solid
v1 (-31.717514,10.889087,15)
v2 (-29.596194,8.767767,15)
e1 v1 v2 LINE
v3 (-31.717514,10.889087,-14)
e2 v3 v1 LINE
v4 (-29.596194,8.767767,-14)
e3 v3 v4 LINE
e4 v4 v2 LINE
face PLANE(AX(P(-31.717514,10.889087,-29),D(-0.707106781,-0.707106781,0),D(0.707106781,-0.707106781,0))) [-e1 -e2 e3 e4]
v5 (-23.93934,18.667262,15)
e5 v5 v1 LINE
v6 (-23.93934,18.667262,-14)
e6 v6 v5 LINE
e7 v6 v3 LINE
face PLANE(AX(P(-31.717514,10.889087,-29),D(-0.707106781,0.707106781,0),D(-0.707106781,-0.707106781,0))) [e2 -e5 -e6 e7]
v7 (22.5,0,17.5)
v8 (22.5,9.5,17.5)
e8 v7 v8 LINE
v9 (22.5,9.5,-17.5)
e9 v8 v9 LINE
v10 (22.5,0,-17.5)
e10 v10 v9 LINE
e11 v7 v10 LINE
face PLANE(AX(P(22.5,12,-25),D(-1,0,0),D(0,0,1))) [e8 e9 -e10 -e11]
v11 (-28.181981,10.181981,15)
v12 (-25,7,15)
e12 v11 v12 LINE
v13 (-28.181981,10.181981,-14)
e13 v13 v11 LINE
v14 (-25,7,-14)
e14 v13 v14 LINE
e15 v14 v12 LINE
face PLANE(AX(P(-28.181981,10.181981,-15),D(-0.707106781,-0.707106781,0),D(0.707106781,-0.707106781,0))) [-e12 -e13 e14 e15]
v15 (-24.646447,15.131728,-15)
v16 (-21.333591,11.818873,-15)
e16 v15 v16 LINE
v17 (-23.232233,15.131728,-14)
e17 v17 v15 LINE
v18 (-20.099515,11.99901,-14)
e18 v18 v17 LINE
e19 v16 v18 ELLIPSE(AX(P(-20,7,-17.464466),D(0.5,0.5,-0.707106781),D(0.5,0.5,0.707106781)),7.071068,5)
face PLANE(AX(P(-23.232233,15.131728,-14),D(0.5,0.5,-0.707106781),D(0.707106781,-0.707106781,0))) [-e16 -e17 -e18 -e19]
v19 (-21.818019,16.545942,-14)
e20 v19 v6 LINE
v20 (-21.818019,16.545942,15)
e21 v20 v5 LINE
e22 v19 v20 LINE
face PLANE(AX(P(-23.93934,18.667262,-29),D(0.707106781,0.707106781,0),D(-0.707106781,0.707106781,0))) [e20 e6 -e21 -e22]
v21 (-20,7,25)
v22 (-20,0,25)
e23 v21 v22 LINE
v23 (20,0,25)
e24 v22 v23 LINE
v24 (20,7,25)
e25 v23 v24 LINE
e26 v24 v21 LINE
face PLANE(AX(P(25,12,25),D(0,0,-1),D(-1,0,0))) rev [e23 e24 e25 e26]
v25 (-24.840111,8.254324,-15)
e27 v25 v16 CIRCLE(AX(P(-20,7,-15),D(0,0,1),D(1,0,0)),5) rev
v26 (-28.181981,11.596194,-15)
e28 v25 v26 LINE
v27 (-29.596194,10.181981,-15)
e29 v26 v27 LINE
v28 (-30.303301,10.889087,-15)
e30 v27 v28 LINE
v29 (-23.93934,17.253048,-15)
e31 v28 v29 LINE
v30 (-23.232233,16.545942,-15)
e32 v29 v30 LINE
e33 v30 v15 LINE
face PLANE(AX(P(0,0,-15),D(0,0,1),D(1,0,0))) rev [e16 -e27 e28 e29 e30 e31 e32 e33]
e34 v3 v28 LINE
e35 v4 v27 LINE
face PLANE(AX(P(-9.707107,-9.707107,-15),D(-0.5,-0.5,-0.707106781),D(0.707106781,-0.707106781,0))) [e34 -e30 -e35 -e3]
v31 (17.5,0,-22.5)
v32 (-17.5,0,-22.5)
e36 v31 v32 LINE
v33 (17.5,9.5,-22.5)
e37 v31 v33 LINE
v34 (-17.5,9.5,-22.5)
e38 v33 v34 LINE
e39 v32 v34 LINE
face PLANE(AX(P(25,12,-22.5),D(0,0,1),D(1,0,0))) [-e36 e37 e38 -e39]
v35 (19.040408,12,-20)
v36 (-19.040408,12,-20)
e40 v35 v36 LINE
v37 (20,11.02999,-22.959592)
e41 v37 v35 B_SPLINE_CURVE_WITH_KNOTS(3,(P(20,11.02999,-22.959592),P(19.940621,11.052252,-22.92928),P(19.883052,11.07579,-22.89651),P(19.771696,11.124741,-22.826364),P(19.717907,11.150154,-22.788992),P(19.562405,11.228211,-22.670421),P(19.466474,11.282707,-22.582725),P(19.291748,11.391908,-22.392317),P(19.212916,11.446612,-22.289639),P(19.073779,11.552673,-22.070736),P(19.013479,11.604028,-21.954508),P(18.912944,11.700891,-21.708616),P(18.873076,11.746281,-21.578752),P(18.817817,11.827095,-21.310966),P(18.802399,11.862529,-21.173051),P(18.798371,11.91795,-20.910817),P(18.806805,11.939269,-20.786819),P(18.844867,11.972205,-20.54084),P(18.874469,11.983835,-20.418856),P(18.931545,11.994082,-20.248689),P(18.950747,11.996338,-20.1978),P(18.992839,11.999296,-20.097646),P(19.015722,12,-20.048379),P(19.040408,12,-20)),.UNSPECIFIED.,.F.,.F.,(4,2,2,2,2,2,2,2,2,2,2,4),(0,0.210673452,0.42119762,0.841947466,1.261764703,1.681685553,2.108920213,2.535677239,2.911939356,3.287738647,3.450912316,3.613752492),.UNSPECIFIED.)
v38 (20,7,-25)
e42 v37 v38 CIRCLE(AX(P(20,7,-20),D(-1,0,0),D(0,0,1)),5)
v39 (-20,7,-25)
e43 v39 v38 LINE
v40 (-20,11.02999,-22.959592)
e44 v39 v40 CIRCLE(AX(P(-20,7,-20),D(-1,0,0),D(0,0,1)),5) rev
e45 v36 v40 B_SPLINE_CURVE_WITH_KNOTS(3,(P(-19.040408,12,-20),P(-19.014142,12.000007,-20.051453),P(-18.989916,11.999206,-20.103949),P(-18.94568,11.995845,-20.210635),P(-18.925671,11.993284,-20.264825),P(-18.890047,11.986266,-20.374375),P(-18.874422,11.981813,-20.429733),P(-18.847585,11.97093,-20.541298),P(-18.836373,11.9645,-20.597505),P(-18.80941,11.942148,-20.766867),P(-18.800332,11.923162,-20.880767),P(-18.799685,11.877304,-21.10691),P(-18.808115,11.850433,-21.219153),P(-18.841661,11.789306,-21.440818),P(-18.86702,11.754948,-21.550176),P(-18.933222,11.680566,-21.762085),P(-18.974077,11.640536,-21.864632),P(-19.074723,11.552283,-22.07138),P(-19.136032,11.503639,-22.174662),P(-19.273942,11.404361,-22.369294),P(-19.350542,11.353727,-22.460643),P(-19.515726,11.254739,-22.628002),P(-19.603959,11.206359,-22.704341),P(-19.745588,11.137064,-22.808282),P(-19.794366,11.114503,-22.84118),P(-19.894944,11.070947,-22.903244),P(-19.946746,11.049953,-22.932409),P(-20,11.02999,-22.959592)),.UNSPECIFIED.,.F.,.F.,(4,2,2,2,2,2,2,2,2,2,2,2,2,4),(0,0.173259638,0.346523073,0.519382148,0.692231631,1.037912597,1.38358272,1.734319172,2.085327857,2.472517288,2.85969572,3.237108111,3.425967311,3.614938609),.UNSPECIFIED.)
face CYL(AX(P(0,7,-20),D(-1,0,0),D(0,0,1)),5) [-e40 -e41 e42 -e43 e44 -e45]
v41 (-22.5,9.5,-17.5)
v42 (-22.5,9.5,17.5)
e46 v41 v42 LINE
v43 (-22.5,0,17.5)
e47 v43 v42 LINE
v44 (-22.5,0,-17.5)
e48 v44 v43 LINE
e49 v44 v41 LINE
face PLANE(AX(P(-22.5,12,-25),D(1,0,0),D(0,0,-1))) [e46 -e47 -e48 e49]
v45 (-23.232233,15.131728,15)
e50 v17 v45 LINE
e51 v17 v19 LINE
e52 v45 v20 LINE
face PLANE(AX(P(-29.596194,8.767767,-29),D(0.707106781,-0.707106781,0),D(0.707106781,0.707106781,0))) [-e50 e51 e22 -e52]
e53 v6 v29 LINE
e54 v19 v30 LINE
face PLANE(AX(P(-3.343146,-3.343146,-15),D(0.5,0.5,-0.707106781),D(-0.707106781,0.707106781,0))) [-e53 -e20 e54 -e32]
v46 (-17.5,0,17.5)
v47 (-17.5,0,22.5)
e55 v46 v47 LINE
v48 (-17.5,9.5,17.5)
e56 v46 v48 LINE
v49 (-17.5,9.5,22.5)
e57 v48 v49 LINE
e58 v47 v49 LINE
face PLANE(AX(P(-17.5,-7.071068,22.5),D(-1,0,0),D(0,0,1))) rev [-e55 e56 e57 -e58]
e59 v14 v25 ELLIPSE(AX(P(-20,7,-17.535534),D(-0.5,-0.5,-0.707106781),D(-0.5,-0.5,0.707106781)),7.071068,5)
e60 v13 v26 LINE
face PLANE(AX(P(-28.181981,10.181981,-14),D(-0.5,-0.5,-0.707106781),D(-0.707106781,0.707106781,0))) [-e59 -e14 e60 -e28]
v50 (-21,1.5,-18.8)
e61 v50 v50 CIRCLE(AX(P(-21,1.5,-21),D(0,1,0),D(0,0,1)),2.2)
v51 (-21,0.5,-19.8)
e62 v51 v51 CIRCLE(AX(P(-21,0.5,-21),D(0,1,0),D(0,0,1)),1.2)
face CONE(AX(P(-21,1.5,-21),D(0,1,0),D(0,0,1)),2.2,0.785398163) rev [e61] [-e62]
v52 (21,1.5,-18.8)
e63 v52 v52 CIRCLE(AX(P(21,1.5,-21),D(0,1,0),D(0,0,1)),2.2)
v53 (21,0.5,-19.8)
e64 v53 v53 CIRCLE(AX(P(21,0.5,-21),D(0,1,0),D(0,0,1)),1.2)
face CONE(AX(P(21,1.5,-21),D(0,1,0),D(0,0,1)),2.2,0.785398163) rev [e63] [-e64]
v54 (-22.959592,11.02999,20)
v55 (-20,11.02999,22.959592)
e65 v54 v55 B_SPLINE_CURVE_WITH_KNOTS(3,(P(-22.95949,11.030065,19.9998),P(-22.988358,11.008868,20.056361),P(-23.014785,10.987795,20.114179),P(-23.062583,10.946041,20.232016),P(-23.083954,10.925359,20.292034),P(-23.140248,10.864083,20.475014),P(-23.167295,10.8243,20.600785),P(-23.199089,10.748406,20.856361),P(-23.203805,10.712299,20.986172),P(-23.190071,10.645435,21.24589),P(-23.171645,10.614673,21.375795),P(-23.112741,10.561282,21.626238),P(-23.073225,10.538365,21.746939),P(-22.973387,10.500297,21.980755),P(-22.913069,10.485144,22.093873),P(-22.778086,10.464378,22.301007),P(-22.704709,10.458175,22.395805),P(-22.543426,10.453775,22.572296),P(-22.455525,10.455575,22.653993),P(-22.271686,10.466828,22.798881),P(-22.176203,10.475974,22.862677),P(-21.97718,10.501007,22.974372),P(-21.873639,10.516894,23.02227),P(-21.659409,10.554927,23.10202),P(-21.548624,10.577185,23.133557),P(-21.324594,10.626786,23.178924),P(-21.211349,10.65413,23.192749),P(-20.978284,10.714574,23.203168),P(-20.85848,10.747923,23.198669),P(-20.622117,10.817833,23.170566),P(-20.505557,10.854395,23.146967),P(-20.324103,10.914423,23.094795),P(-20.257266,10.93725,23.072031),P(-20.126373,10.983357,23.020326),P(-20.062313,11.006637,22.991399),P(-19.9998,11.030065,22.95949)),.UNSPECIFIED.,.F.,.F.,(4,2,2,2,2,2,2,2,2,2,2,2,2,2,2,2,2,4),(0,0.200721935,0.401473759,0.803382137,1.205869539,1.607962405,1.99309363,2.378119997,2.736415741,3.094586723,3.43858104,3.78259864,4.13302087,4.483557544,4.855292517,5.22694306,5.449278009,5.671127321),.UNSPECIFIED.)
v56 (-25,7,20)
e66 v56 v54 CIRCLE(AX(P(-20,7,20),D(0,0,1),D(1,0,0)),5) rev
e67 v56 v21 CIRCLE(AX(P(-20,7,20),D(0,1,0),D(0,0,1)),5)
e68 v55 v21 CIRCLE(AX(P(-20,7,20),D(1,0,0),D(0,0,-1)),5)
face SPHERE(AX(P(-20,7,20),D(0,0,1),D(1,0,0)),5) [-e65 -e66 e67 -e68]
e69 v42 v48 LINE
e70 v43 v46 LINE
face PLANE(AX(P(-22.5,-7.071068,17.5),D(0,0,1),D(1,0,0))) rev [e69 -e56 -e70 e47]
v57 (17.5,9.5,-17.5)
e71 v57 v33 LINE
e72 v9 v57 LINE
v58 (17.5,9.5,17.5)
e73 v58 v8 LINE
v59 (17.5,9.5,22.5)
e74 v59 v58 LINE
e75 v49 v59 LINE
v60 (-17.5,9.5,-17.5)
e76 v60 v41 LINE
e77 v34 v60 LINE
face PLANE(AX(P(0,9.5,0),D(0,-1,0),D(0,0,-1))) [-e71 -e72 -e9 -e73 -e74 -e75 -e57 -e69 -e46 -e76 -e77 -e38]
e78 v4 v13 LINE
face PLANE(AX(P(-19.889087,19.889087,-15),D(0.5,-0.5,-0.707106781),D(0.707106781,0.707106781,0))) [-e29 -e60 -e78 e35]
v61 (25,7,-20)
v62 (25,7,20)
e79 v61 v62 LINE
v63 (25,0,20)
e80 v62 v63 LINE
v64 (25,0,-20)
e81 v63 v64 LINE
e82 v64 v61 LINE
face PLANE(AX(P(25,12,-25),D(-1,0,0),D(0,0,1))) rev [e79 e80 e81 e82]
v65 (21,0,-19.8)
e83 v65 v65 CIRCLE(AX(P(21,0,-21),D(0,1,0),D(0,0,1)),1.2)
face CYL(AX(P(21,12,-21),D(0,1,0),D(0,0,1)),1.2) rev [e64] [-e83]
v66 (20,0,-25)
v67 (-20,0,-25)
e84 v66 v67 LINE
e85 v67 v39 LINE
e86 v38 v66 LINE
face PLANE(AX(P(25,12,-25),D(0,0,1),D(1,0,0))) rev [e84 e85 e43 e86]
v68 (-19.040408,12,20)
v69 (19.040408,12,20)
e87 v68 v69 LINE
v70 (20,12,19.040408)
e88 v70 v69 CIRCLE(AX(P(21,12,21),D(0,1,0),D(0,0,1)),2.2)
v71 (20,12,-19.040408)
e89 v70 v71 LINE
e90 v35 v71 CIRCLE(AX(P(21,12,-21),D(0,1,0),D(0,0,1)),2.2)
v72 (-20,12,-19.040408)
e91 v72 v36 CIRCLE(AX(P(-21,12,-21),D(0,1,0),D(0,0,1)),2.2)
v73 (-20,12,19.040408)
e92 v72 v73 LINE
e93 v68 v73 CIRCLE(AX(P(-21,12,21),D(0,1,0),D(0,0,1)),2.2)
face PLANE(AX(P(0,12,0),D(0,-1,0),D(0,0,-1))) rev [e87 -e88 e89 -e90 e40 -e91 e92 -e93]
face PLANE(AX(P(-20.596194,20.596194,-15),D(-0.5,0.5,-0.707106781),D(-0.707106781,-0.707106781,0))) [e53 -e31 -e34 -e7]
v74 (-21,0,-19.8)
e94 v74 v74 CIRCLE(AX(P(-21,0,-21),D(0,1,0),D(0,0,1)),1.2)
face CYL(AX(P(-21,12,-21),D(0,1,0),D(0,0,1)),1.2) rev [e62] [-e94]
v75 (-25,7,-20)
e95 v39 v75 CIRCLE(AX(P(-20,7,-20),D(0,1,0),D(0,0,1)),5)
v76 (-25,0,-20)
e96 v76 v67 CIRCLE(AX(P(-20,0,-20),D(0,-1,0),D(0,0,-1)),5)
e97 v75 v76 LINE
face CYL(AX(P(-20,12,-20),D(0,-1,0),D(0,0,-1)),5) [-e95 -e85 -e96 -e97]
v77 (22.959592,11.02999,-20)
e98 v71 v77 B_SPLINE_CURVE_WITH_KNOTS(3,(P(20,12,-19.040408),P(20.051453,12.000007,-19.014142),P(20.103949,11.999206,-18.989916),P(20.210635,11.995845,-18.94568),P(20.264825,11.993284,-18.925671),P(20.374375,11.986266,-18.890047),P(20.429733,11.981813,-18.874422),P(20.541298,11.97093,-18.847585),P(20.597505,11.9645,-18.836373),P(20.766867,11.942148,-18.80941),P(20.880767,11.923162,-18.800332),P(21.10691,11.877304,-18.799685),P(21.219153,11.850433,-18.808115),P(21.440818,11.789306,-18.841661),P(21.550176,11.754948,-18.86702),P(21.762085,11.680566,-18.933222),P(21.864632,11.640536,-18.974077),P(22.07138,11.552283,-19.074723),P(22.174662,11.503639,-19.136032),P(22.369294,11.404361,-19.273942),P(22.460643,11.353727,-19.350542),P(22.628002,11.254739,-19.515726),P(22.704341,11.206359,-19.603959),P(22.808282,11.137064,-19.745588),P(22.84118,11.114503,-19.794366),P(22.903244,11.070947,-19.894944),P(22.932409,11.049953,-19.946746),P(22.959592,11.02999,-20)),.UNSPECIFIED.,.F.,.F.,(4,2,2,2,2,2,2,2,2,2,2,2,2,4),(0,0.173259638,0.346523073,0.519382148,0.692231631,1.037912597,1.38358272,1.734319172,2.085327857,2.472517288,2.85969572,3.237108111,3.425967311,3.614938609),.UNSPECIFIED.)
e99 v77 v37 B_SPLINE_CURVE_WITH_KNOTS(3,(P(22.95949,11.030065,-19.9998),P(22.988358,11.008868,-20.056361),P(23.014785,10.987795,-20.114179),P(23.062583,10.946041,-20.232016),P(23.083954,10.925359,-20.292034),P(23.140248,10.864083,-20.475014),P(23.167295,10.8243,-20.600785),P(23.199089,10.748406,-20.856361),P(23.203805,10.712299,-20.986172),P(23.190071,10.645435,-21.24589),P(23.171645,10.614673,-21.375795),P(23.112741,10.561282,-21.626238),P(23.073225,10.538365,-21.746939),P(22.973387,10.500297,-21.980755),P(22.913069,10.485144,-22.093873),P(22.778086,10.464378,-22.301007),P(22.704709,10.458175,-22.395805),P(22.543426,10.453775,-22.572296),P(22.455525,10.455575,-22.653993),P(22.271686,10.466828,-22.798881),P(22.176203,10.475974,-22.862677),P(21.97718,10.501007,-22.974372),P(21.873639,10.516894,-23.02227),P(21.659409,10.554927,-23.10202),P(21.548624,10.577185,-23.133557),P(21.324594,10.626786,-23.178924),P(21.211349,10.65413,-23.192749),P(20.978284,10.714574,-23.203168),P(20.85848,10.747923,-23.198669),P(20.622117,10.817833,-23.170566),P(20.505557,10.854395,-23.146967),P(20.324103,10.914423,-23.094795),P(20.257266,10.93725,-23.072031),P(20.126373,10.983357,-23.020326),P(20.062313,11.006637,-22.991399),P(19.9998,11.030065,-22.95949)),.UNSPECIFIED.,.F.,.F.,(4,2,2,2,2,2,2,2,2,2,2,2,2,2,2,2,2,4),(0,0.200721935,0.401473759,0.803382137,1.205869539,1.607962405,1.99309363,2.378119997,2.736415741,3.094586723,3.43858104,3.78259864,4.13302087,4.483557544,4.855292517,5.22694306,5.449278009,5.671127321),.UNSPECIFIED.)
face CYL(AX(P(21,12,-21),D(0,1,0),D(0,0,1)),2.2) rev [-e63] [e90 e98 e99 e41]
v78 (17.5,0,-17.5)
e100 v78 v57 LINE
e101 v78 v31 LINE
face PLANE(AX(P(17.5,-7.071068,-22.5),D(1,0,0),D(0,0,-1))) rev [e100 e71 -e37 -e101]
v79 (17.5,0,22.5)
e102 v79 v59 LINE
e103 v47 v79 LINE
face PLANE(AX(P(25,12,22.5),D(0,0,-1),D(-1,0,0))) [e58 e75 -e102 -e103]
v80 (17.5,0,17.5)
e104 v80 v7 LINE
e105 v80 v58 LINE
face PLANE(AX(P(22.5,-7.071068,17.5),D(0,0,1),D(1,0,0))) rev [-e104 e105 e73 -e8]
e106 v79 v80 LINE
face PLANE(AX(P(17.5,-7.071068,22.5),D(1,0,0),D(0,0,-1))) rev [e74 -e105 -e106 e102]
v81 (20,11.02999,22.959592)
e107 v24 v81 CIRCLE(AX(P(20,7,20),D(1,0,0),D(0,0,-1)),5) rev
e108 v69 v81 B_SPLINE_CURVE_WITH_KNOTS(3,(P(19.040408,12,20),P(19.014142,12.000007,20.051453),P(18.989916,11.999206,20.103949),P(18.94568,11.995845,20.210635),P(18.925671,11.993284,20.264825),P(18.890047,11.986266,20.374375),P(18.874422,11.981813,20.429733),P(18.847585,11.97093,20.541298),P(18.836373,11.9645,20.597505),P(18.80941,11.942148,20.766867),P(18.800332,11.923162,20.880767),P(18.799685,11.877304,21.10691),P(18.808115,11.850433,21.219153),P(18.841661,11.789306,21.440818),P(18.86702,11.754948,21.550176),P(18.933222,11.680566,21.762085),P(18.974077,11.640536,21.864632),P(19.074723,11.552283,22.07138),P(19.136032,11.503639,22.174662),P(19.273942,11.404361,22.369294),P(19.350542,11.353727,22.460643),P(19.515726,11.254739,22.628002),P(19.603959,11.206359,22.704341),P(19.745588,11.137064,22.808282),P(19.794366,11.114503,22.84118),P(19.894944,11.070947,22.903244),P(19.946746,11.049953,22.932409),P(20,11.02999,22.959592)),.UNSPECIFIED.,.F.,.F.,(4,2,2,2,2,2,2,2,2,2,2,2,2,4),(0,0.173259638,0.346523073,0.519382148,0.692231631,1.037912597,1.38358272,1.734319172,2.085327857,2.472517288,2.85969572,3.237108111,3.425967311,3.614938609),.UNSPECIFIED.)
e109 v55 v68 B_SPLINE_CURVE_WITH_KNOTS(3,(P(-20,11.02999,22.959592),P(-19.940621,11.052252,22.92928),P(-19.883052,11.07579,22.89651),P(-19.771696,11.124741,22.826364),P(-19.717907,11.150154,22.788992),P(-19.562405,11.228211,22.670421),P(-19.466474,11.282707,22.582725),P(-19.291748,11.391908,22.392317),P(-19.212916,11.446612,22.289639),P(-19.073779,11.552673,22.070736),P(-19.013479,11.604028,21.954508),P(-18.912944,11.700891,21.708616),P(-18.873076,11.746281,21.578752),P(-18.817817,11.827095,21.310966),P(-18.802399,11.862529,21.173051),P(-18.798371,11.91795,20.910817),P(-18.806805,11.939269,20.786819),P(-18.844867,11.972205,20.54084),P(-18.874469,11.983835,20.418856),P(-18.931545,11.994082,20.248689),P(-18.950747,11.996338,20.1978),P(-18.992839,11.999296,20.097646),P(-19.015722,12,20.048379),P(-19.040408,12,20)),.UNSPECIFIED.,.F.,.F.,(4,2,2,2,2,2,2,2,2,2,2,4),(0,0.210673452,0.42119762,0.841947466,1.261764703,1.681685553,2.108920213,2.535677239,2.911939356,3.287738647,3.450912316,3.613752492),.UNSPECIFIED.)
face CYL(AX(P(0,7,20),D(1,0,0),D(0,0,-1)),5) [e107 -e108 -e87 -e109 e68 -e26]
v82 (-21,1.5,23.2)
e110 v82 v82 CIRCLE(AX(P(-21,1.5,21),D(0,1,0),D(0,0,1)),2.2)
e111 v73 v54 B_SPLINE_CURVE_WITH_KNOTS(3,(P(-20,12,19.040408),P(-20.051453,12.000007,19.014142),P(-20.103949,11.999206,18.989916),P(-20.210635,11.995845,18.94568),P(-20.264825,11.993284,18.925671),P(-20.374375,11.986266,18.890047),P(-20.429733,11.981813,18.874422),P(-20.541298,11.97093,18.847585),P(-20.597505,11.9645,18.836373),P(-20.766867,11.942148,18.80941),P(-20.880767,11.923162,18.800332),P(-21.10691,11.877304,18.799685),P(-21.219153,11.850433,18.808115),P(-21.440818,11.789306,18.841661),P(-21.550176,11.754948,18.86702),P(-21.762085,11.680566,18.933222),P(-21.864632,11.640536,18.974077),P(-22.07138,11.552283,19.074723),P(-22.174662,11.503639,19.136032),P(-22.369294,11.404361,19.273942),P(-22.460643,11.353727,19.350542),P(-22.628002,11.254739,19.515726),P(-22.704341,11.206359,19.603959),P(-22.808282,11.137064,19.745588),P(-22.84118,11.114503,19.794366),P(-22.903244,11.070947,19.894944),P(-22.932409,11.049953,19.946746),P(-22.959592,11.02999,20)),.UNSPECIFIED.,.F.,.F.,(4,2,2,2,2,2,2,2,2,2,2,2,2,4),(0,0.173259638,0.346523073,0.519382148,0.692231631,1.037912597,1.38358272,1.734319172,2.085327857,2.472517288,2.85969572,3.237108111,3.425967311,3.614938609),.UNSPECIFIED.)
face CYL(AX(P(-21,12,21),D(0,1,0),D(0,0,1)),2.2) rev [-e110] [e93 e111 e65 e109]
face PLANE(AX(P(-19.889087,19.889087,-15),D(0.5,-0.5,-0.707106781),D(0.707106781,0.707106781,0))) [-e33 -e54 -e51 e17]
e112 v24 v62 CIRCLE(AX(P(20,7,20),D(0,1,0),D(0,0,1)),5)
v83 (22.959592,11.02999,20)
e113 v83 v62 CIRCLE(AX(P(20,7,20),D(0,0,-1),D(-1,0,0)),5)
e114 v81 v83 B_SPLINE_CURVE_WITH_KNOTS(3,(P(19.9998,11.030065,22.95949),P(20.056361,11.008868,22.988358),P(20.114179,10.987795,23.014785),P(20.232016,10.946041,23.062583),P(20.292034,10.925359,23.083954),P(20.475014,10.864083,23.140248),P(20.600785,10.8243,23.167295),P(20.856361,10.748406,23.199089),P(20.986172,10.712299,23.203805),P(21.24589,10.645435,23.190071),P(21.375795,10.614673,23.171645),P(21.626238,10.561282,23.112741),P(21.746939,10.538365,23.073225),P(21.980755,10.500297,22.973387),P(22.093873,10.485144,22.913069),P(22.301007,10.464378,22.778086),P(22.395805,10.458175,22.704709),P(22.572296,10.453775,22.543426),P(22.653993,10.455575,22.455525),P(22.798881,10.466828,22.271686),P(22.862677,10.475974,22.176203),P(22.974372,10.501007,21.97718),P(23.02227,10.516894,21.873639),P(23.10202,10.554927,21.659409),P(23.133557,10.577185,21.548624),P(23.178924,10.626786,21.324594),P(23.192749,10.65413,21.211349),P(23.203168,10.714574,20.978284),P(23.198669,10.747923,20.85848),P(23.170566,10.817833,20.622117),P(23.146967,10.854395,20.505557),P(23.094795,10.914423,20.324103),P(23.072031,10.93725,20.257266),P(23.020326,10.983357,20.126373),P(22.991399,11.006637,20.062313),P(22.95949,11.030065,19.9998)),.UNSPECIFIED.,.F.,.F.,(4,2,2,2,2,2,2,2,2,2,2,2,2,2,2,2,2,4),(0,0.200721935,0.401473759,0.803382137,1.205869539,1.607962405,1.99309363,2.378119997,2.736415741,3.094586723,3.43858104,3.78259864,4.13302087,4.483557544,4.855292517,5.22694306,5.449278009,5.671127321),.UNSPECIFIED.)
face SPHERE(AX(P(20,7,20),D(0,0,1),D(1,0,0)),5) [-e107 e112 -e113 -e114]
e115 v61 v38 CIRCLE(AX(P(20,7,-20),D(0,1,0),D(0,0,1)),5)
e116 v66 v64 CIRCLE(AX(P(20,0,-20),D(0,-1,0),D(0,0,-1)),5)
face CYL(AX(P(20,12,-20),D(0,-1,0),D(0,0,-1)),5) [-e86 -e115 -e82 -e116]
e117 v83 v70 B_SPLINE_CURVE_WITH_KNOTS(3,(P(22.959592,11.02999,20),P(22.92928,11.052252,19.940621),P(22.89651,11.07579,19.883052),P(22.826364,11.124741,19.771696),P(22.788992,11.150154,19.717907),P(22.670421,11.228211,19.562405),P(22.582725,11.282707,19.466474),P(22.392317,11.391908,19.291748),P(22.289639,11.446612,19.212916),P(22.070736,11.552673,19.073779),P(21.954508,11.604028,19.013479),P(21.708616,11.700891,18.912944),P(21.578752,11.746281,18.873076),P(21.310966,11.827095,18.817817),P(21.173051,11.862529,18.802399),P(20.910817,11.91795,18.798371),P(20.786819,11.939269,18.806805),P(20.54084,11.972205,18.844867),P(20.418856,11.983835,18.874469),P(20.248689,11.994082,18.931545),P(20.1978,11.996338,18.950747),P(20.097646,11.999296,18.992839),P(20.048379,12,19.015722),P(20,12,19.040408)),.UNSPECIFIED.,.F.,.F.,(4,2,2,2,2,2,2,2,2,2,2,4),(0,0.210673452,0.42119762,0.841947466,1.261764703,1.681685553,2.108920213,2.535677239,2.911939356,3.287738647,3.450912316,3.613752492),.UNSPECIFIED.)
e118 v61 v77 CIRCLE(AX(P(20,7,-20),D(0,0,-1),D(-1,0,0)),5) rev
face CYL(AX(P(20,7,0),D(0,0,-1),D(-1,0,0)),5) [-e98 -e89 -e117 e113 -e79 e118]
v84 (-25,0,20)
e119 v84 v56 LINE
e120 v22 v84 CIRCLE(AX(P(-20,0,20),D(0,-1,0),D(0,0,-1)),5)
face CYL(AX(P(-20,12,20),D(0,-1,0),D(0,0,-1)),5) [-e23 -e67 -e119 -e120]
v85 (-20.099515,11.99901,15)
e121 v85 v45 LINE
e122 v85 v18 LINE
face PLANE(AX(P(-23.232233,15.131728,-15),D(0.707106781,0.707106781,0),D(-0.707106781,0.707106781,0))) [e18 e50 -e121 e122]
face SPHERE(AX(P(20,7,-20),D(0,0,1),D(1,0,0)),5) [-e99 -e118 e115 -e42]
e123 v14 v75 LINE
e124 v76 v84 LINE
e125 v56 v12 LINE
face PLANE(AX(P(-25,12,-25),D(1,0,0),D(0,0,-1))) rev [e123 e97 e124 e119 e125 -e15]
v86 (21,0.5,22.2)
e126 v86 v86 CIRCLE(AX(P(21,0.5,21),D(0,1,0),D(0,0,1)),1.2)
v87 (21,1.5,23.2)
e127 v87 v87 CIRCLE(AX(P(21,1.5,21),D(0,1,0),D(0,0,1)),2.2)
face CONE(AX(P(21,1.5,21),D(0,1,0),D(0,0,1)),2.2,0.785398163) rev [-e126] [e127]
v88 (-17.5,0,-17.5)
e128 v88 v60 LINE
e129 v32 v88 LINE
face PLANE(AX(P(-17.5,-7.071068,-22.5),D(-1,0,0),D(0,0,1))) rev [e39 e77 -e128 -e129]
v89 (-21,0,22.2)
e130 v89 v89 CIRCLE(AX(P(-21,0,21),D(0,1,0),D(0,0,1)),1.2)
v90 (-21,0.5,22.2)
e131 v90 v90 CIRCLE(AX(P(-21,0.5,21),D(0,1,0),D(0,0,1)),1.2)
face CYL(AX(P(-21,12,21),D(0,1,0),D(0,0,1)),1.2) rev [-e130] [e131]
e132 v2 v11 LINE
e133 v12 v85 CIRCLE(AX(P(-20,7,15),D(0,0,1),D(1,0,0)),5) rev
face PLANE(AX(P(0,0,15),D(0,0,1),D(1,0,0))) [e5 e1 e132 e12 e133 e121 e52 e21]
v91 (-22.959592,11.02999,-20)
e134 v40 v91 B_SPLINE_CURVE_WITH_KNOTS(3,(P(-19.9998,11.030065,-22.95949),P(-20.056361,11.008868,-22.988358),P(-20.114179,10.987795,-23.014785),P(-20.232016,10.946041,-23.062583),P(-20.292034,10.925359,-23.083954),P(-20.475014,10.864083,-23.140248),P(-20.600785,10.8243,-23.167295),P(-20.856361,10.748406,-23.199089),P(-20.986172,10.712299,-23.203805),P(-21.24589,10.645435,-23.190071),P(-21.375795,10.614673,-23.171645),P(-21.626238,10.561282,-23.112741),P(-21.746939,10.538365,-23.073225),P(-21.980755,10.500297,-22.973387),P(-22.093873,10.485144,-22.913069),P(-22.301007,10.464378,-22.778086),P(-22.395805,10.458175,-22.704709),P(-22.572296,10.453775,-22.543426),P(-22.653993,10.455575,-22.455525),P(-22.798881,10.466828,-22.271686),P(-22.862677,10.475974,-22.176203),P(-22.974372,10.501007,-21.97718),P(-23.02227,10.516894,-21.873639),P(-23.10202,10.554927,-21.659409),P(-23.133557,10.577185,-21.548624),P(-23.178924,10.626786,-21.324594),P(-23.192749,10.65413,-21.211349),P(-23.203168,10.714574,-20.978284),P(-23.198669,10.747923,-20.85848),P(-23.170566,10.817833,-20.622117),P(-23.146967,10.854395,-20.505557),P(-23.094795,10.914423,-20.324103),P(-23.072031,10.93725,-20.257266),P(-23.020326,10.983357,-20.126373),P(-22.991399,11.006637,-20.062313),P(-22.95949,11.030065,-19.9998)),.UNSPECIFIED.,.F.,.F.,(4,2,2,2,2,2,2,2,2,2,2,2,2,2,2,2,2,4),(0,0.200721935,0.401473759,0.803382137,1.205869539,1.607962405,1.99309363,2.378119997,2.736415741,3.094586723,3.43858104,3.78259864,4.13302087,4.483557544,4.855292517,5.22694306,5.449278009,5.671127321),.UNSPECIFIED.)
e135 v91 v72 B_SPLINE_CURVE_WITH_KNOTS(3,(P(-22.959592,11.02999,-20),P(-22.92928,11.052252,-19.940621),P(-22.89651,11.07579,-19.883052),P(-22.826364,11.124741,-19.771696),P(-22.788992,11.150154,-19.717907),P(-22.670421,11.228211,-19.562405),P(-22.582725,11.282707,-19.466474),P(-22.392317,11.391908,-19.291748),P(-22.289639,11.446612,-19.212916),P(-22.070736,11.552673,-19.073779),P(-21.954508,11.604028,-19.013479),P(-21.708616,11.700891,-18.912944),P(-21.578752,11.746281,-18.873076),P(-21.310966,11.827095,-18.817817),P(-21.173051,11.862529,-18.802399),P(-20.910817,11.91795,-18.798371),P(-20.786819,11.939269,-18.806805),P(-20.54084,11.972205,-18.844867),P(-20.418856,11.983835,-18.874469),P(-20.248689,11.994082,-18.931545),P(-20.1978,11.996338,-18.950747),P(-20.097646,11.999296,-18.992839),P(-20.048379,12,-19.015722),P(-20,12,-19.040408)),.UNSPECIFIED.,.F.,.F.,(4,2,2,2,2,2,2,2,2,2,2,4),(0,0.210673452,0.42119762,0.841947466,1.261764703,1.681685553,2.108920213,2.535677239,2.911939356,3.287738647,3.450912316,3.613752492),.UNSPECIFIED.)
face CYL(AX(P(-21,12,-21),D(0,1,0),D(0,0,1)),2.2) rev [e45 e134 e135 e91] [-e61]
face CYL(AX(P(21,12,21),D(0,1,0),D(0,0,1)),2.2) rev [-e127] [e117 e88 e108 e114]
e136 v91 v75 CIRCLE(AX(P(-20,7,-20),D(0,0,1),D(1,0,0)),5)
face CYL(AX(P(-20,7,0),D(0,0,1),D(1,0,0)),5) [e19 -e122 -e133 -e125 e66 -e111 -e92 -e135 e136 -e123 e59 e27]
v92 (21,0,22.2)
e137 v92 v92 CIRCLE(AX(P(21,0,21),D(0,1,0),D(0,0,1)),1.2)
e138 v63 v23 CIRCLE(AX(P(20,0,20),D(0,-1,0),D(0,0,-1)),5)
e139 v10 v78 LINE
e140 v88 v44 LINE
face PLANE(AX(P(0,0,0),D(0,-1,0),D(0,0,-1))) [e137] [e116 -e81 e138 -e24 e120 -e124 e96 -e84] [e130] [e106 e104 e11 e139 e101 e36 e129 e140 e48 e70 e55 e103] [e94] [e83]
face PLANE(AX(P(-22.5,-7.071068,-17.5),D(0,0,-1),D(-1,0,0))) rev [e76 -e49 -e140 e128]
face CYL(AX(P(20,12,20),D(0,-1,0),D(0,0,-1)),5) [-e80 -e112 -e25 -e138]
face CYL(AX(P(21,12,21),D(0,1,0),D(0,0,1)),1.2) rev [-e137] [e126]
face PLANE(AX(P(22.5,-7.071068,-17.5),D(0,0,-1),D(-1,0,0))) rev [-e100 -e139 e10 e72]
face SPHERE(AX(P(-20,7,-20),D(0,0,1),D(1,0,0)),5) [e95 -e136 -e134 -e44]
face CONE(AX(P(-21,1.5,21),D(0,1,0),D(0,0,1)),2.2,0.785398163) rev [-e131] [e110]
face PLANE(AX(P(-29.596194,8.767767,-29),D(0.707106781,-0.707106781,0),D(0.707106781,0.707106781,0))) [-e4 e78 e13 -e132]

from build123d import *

# Parameters (mm, degrees)
SKETCH1_W                                    = 50
SKETCH1_H                                    = 50
MAIN_BODY_DEPTH                              = 12
SHELL1_T                                     = -2.5
FILLET1_R                                    = 5
SKETCH6_W                                    = 5
SKETCH6_H                                    = 5
SCREW_SUPPORTS_DEPTH                         = 9.5
FILLET2_R                                    = 5
CSK_SLOT_FOR_M2_COUNTERSUNK_FLAT_HEA_2_COUNT = 2
CSK_SLOT_FOR_M2_COUNTERSUNK_FLAT_HEA_2_PITCH = 42
CSK_SLOT_FOR_M2_COUNTERSUNK_FLAT_HEA_3_COUNT = 2
CSK_SLOT_FOR_M2_COUNTERSUNK_FLAT_HEA_3_PITCH = 42
CSK_SLOT_FOR_M2_COUNTERSUNK_FLAT_HEA_4_COUNT = 2
CSK_SLOT_FOR_M2_COUNTERSUNK_FLAT_HEA_4_PITCH = 59.39696962
SKETCH13_W                                   = 13
SKETCH13_H                                   = 26
TOP_CONNECTOR_EXTRUDE_DEPTH                  = 6
SKETCH14_W                                   = 2
SKETCH14_H                                   = 3
DOVETAIL_CUT_DEPTH                           = 51.884673656
FILLET3_R                                    = 2
SKETCH16_W                                   = 8
SKETCH16_H                                   = 3.3
POGO_BODY_CUT_DEPTH                          = 8
SKETCH19_W                                   = 8
SKETCH19_H                                   = 0.6
POGO_BACK_SUPPORT_DEPTH                      = 3.2
SKETCH20_W                                   = 8
SKETCH20_H                                   = 2
POGO_STOPPER_DEPTH                           = 0.6
SKETCH23_W                                   = 15
SKETCH23_H                                   = 40
CUT_EXTRUDE1_DEPTH                           = 38.336309539
BOSS_EXTRUDE1_START                          = -10
BOSS_EXTRUDE1_DEPTH                          = 30
BOSS_EXTRUDE2_DEPTH                          = 30
CHAMFER2_SIZE                                = 1


with BuildPart() as part:
    # Sketch1 → main body (new body)
    with BuildSketch(Plane(origin=(0, 0, 0), x_dir=(1, 0, 0), z_dir=(0, 1, 0))):
        Rectangle(SKETCH1_W, SKETCH1_H)
    extrude(amount=MAIN_BODY_DEPTH)

    # Shell1
    shell1_openings = [part.faces().sort_by_distance(p)[0] for p in [
        (0, 0, 0),
    ]]
    offset(amount=SHELL1_T, openings=shell1_openings, kind=Kind.INTERSECTION)

    # Fillet1
    fillet1_edges = [part.edges().sort_by_distance(p)[0] for p in [
        (25, 12, 0),
        (0, 12, -25),
        (-25, 12, 0),
        (0, 12, 25),
    ]]
    fillet(fillet1_edges, radius=FILLET1_R)

    # Sketch6 → screw supports (add)
    with BuildSketch(Plane.XZ.offset(-9.5)):
        with Locations((20, 20)):
            Rectangle(SKETCH6_W, SKETCH6_H)
        with Locations((-20, 20)):
            Rectangle(SKETCH6_W, SKETCH6_H)
        with Locations((20, -20)):
            Rectangle(SKETCH6_W, SKETCH6_H)
        with Locations((-20, -20)):
            Rectangle(SKETCH6_W, SKETCH6_H)
    extrude(amount=SCREW_SUPPORTS_DEPTH)

    # Fillet2
    # the kernel refuses this fillet: 5 mm, written as the material it takes off along each edge
    with BuildSketch(Plane(origin=(-20, 7, 20), x_dir=(0, 0, 1), z_dir=(-1, 0, 0))) as fillet2_piece_1_section:
        Polygon((0, 0), (FILLET2_R, 0), (FILLET2_R, FILLET2_R), (0, FILLET2_R), align=None)
    fillet2_piece_1 = extrude(amount=FILLET2_R, mode=Mode.PRIVATE)
    fillet2_piece_1 = fillet2_piece_1 - Plane(origin=(-20, 7, 20), x_dir=(0, -0.7071067811865475, -0.7071067811865475), z_dir=(-1, 0, 0)) * Sphere(FILLET2_R, mode=Mode.PRIVATE)
    add(fillet2_piece_1, mode=Mode.SUBTRACT)
    with BuildSketch(Plane(origin=(-20, 7, -20), x_dir=(-1, 0, 0), z_dir=(0, 0, -1))) as fillet2_piece_2_section:
        Polygon((0, 0), (FILLET2_R, 0), (FILLET2_R, FILLET2_R), (0, FILLET2_R), align=None)
    fillet2_piece_2 = extrude(amount=FILLET2_R, mode=Mode.PRIVATE)
    fillet2_piece_2 = fillet2_piece_2 - Plane(origin=(-20, 7, -20), x_dir=(0.7071067811865475, -0.7071067811865475, 0), z_dir=(0, 0, -1)) * Sphere(FILLET2_R, mode=Mode.PRIVATE)
    add(fillet2_piece_2, mode=Mode.SUBTRACT)
    with BuildSketch(Plane(origin=(20, 7, 20), x_dir=(0, 0, 1), z_dir=(1, 0, 0))) as fillet2_piece_3_section:
        Polygon((0, 0), (FILLET2_R, 0), (FILLET2_R, -FILLET2_R), (0, -FILLET2_R), align=None)
    fillet2_piece_3 = extrude(amount=FILLET2_R, mode=Mode.PRIVATE)
    fillet2_piece_3 = fillet2_piece_3 - Plane(origin=(20, 7, 20), x_dir=(0, -0.7071067811865475, -0.7071067811865475), z_dir=(1, 0, 0)) * Sphere(FILLET2_R, mode=Mode.PRIVATE)
    add(fillet2_piece_3, mode=Mode.SUBTRACT)
    with BuildSketch(Plane(origin=(20, 7, -20), x_dir=(1, 0, 0), z_dir=(0, 0, -1))) as fillet2_piece_4_section:
        Polygon((0, 0), (FILLET2_R, 0), (FILLET2_R, -FILLET2_R), (0, -FILLET2_R), align=None)
    fillet2_piece_4 = extrude(amount=FILLET2_R, mode=Mode.PRIVATE)
    fillet2_piece_4 = fillet2_piece_4 - Plane(origin=(20, 7, -20), x_dir=(-0.7071067811865475, -0.7071067811865475, 0), z_dir=(0, 0, -1)) * Sphere(FILLET2_R, mode=Mode.PRIVATE)
    add(fillet2_piece_4, mode=Mode.SUBTRACT)
    with BuildSketch(Plane(origin=(25, -12.5, -25), x_dir=(-1, 0, 0), z_dir=(0, 1, 0)), Plane(origin=(25, -12.5, 25), x_dir=(0, 0, -1), z_dir=(0, 1, 0))) as fillet2_piece_5:
        with BuildLine():
            CenterArc((FILLET2_R, FILLET2_R), FILLET2_R, 180, 90)
            Line((0, FILLET2_R), (0, 0))
            Line((0, 0), (FILLET2_R, 0))
        make_face()
    extrude(amount=19.5, mode=Mode.SUBTRACT)
    with BuildSketch(Plane(origin=(-25, -12.5, -25), x_dir=(1, 0, 0), z_dir=(0, 1, 0)), Plane(origin=(-25, -12.5, 25), x_dir=(0, 0, -1), z_dir=(0, 1, 0))) as fillet2_piece_6:
        with BuildLine():
            CenterArc((FILLET2_R, -FILLET2_R), FILLET2_R, 90, 90)
            Line((0, -FILLET2_R), (0, 0))
            Line((0, 0), (FILLET2_R, 0))
        make_face()
    extrude(amount=19.5, mode=Mode.SUBTRACT)

    # Sketch12 → CSK SLOT for M2 Countersunk Flat Head Screw1 (revolve, cut)
    with BuildSketch(Plane(origin=(-21, 12, -21), x_dir=(0, 0, 1), z_dir=(1, 0, 0))):
        Polygon((0, 0), (0, 12), (1.2, 12), (1.2, 11.5), (2.2, 10.5), (2.2, 0), align=None)
    csk_slot_for_m2_countersunk_flat_head_sc = revolve(axis=Axis((-21, 18.35, -21), (0, -1, 0)), mode=Mode.SUBTRACT)

    # CSK SLOT for M2 Countersunk Flat Hea 2: CSK SLOT for M2 Countersunk Flat Head Screw1 ×2
    with Locations(*[(i * CSK_SLOT_FOR_M2_COUNTERSUNK_FLAT_HEA_2_PITCH, 0, 0) for i in range(1, CSK_SLOT_FOR_M2_COUNTERSUNK_FLAT_HEA_2_COUNT)]):
        add(csk_slot_for_m2_countersunk_flat_head_sc, mode=Mode.SUBTRACT)

    # CSK SLOT for M2 Countersunk Flat Hea 3: CSK SLOT for M2 Countersunk Flat Head Screw1 ×2
    with Locations(*[(0, 0, i * CSK_SLOT_FOR_M2_COUNTERSUNK_FLAT_HEA_3_PITCH) for i in range(1, CSK_SLOT_FOR_M2_COUNTERSUNK_FLAT_HEA_3_COUNT)]):
        add(csk_slot_for_m2_countersunk_flat_head_sc, mode=Mode.SUBTRACT)

    # CSK SLOT for M2 Countersunk Flat Hea 4: CSK SLOT for M2 Countersunk Flat Head Screw1 ×2
    with Locations(*[Vector(0.7071067811865475, 0, 0.7071067811865477) * (i * CSK_SLOT_FOR_M2_COUNTERSUNK_FLAT_HEA_4_PITCH) for i in range(1, CSK_SLOT_FOR_M2_COUNTERSUNK_FLAT_HEA_4_COUNT)]):
        add(csk_slot_for_m2_countersunk_flat_head_sc, mode=Mode.SUBTRACT)

    # Sketch13 → top connector extrude (add)
    with BuildSketch(Plane(origin=(0, 12, 0), x_dir=(1, 0, 0), z_dir=(0, 1, 0))):
        with Locations((0, -2.5)):
            Rectangle(SKETCH13_W, SKETCH13_H)
    extrude(amount=TOP_CONNECTOR_EXTRUDE_DEPTH)

    # Sketch14 → dovetail cut (cut, through all)
    with BuildSketch(Plane.XY.offset(15.5)):
        with Locations((-5.5, 13.5)):
            Rectangle(SKETCH14_W, SKETCH14_H)
        with Locations((5.5, 13.5)):
            Rectangle(SKETCH14_W, SKETCH14_H)
    extrude(amount=-DOVETAIL_CUT_DEPTH, mode=Mode.SUBTRACT)

    # Fillet3
    fillet3_edges = [part.edges().sort_by_distance(p)[0] for p in [
        (0, 18, -10.5),
        (-6.5, 16.5, -10.5),
        (6.5, 16.5, -10.5),
    ]]
    fillet(fillet3_edges, radius=FILLET3_R)

    # Sketch16 → pogo body cut (cut)
    with BuildSketch(Plane(origin=(0, 0, -10.5), x_dir=(-1, 0, 0), z_dir=(0, 0, -1))):
        with Locations((0, 16.35)):
            Rectangle(SKETCH16_W, SKETCH16_H)
    extrude(amount=-POGO_BODY_CUT_DEPTH, mode=Mode.SUBTRACT)

    # Sketch19 → pogo back support (add)
    with BuildSketch(Plane(origin=(0, 0, -2.5), x_dir=(-1, 0, 0), z_dir=(0, 0, -1))):
        with Locations((0, 17.7)):
            Rectangle(SKETCH19_W, SKETCH19_H)
    extrude(amount=POGO_BACK_SUPPORT_DEPTH)

    # Sketch20 → pogo stopper (add)
    with BuildSketch(Plane.XZ.offset(-17.4)):
        with Locations((0, -3.5)):
            Rectangle(SKETCH20_W, SKETCH20_H)
    extrude(amount=POGO_STOPPER_DEPTH)

    # Sketch23 → Cut-Extrude1 (cut, through all)
    with BuildSketch(Plane(origin=(0, 12, 0), x_dir=(1, 0, 0), z_dir=(0, 1, 0))):
        Rectangle(SKETCH23_W, SKETCH23_H)
    extrude(amount=CUT_EXTRUDE1_DEPTH, mode=Mode.SUBTRACT)

    # Sketch27 → Boss-Extrude1 (add)
    with BuildSketch(Plane.XY.offset(25).offset(BOSS_EXTRUDE1_START)):
        Polygon((-28.181980515, 10.181980515), (-23.232233047, 15.131727984), (-20.050252532, 11.949747468), (-25, 7), align=None)
    extrude(amount=-BOSS_EXTRUDE1_DEPTH)

    # Sketch29 → Boss-Extrude2 (add)
    with BuildSketch(Plane.XY.offset(15)):
        Polygon((-31.717514421, 10.889087297), (-23.939339828, 18.66726189), (-21.818019485, 16.545941546), (-29.596194078, 8.767766953), align=None)
    extrude(amount=-BOSS_EXTRUDE2_DEPTH)

    # Chamfer2
    # the kernel refuses this chamfer: 1 mm, written as the material it takes off along each edge
    with BuildSketch(Plane(origin=(-23.18154552, 5.18154552, -15), x_dir=(0.7068394360706733, 0.7068394360706738, -0.027495876610585664), z_dir=(-0.7071067811865477, 0.7071067811865474, 0))) as chamfer2_piece_1_section:
        Polygon((CHAMFER2_SIZE * 0.999621916911, -CHAMFER2_SIZE * 0.0274958766106), (-CHAMFER2_SIZE * 0.0274958766106, -CHAMFER2_SIZE * 0.999621916911), (0, 0), align=None)
    chamfer2_piece_1 = extrude(amount=7.071682988, mode=Mode.PRIVATE)
    chamfer2_piece_1 = chamfer2_piece_1 - Plane(origin=(-20, 7, -14.821451395), x_dir=(-1, 0, 0), z_dir=(0, 0, 1)) * Cylinder(5, 19, mode=Mode.PRIVATE)
    add(chamfer2_piece_1, mode=Mode.SUBTRACT)
    with BuildSketch(Plane(origin=(-23.232233047, 15.131727984, -15), x_dir=(-0.7068394360706741, -0.7068394360706729, -0.027495876610583902), z_dir=(0.7071067811865469, -0.7071067811865481, 0))) as chamfer2_piece_2_section:
        Polygon((CHAMFER2_SIZE * 0.999621916911, -CHAMFER2_SIZE * 0.0274958766106), (-CHAMFER2_SIZE * 0.0274958766106, -CHAMFER2_SIZE * 0.999621916911), (0, 0), align=None)
    chamfer2_piece_2 = extrude(amount=7.002015834, mode=Mode.PRIVATE)
    chamfer2_piece_2 = chamfer2_piece_2 - Plane(origin=(-20, 7, -14.663806986), x_dir=(-1, 0, 0), z_dir=(0, 0, 1)) * Cylinder(5, 19, mode=Mode.PRIVATE)
    add(chamfer2_piece_2, mode=Mode.SUBTRACT)
    with BuildSketch(Plane(origin=(-27.777739598, 6.949312473, -15), x_dir=(-0.01944252080601335, -0.0194425208060134, 0.9996219169112968), z_dir=(-0.7071067811865485, 0.7071067811865467, 0)), Plane(origin=(-25.757794308, 20.485716369, -15), x_dir=(0.019442520806015502, 0.019442520806015565, 0.9996219169112968), z_dir=(0.7071067811865487, -0.7071067811865464, 0))) as chamfer2_piece_3:
        Polygon((CHAMFER2_SIZE * 0.999621916911, CHAMFER2_SIZE * 0.0274958766106), (-CHAMFER2_SIZE * 0.0274958766106, CHAMFER2_SIZE * 0.999621916911), (0, 0), align=None)
    extrude(amount=8.143365976, mode=Mode.SUBTRACT)
    with BuildSketch(Plane(origin=(-33.535968901, 9.070632817, -15), x_dir=(-0.01944252080601553, 0.019442520806015537, 0.9996219169112968), z_dir=(0.7071067811865477, 0.7071067811865474, 0))) as chamfer2_piece_4:
        Polygon((CHAMFER2_SIZE * 0.999621916911, CHAMFER2_SIZE * 0.0274958766106), (-CHAMFER2_SIZE * 0.0274958766106, CHAMFER2_SIZE * 0.999621916911), (0, 0), align=None)
    extrude(amount=16.143365976, mode=Mode.SUBTRACT)
    with BuildSketch(Plane(origin=(-19.999565005, 18.364396026, -15), x_dir=(-0.7068394360706738, 0.7068394360706733, -0.0274958766105857), z_dir=(-0.7071067811865474, -0.7071067811865478, 0)), Plane(origin=(-28.181980515, 10.181980515, -15), x_dir=(-0.7068394360706738, 0.7068394360706733, -0.027495876610585664), z_dir=(-0.7071067811865474, -0.7071067811865478, 0))) as chamfer2_piece_5:
        Polygon((CHAMFER2_SIZE * 0.999621916911, -CHAMFER2_SIZE * 0.0274958766106), (-CHAMFER2_SIZE * 0.0274958766106, -CHAMFER2_SIZE * 0.999621916911), (0, 0), align=None)
    extrude(amount=4.571682988, mode=Mode.SUBTRACT)
    with BuildSketch(Plane(origin=(-23.18154552, 5.18154552, -15), x_dir=(0.7068394360706733, 0.7068394360706738, -0.027495876610585664), z_dir=(-0.7071067811865477, 0.7071067811865474, 0))) as chamfer2_piece_6a_section:
        Polygon((CHAMFER2_SIZE * 0.999621916911, -CHAMFER2_SIZE * 0.0274958766106), (-CHAMFER2_SIZE * 0.0274958766106, -CHAMFER2_SIZE * 0.999621916911), (0, 0), align=None)
    chamfer2_piece_6a = extrude(amount=9.643365976, mode=Mode.PRIVATE)
    chamfer2_piece_6a = split(chamfer2_piece_6a, bisect_by=Plane(origin=(-27.948781205, 10.415179825, -14.670206373), z_dir=(-0.7071067811865478, 0.7071067811865474, 0)), keep=Keep.TOP, mode=Mode.PRIVATE)
    with BuildSketch(Plane(origin=(-26.363526035, 12.000434995, -15), x_dir=(-0.7068394360706738, 0.7068394360706733, -0.027495876610585664), z_dir=(-0.7071067811865474, -0.7071067811865478, 0))) as chamfer2_piece_6b_section:
        Polygon((CHAMFER2_SIZE * 0.999621916911, -CHAMFER2_SIZE * 0.0274958766106), (-CHAMFER2_SIZE * 0.0274958766106, -CHAMFER2_SIZE * 0.999621916911), (0, 0), align=None)
    chamfer2_piece_6b = extrude(amount=7.143365976, mode=Mode.PRIVATE)
    chamfer2_piece_6b = split(chamfer2_piece_6b, bisect_by=Plane(origin=(-28.415179825, 10.415179825, -14.670206373), z_dir=(0.7071067811865474, 0.7071067811865477, 0)), keep=Keep.TOP, mode=Mode.PRIVATE)
    chamfer2_piece_6 = chamfer2_piece_6a & chamfer2_piece_6b
    add(chamfer2_piece_6, mode=Mode.SUBTRACT)
    with BuildSketch(Plane(origin=(-19.999565005, 18.364396026, -15), x_dir=(-0.7068394360706738, 0.7068394360706733, -0.0274958766105857), z_dir=(-0.7071067811865474, -0.7071067811865478, 0))) as chamfer2_piece_7a_section:
        Polygon((CHAMFER2_SIZE * 0.999621916911, -CHAMFER2_SIZE * 0.0274958766106), (-CHAMFER2_SIZE * 0.0274958766106, -CHAMFER2_SIZE * 0.999621916911), (0, 0), align=None)
    chamfer2_piece_7a = extrude(amount=7.143365976, mode=Mode.PRIVATE)
    chamfer2_piece_7a = split(chamfer2_piece_7a, bisect_by=Plane(origin=(-23.465432357, 15.364927294, -14.670206373), z_dir=(-0.7071067811865481, -0.7071067811865469, 0)), keep=Keep.TOP, mode=Mode.PRIVATE)
    with BuildSketch(Plane(origin=(-25.050687527, 16.950182463, -15), x_dir=(-0.7068394360706741, -0.7068394360706729, -0.02749587661058563), z_dir=(0.7071067811865469, -0.7071067811865481, 0))) as chamfer2_piece_7b_section:
        Polygon((CHAMFER2_SIZE * 0.999621916911, -CHAMFER2_SIZE * 0.0274958766106), (-CHAMFER2_SIZE * 0.0274958766106, -CHAMFER2_SIZE * 0.999621916911), (0, 0), align=None)
    chamfer2_piece_7b = extrude(amount=9.573698822, mode=Mode.PRIVATE)
    chamfer2_piece_7b = split(chamfer2_piece_7b, bisect_by=Plane(origin=(-23.465432357, 14.898528674, -14.670206373), z_dir=(-0.7071067811865478, 0.7071067811865474, 0)), keep=Keep.TOP, mode=Mode.PRIVATE)
    chamfer2_piece_7 = chamfer2_piece_7a & chamfer2_piece_7b
    add(chamfer2_piece_7, mode=Mode.SUBTRACT)


solid = part.part
